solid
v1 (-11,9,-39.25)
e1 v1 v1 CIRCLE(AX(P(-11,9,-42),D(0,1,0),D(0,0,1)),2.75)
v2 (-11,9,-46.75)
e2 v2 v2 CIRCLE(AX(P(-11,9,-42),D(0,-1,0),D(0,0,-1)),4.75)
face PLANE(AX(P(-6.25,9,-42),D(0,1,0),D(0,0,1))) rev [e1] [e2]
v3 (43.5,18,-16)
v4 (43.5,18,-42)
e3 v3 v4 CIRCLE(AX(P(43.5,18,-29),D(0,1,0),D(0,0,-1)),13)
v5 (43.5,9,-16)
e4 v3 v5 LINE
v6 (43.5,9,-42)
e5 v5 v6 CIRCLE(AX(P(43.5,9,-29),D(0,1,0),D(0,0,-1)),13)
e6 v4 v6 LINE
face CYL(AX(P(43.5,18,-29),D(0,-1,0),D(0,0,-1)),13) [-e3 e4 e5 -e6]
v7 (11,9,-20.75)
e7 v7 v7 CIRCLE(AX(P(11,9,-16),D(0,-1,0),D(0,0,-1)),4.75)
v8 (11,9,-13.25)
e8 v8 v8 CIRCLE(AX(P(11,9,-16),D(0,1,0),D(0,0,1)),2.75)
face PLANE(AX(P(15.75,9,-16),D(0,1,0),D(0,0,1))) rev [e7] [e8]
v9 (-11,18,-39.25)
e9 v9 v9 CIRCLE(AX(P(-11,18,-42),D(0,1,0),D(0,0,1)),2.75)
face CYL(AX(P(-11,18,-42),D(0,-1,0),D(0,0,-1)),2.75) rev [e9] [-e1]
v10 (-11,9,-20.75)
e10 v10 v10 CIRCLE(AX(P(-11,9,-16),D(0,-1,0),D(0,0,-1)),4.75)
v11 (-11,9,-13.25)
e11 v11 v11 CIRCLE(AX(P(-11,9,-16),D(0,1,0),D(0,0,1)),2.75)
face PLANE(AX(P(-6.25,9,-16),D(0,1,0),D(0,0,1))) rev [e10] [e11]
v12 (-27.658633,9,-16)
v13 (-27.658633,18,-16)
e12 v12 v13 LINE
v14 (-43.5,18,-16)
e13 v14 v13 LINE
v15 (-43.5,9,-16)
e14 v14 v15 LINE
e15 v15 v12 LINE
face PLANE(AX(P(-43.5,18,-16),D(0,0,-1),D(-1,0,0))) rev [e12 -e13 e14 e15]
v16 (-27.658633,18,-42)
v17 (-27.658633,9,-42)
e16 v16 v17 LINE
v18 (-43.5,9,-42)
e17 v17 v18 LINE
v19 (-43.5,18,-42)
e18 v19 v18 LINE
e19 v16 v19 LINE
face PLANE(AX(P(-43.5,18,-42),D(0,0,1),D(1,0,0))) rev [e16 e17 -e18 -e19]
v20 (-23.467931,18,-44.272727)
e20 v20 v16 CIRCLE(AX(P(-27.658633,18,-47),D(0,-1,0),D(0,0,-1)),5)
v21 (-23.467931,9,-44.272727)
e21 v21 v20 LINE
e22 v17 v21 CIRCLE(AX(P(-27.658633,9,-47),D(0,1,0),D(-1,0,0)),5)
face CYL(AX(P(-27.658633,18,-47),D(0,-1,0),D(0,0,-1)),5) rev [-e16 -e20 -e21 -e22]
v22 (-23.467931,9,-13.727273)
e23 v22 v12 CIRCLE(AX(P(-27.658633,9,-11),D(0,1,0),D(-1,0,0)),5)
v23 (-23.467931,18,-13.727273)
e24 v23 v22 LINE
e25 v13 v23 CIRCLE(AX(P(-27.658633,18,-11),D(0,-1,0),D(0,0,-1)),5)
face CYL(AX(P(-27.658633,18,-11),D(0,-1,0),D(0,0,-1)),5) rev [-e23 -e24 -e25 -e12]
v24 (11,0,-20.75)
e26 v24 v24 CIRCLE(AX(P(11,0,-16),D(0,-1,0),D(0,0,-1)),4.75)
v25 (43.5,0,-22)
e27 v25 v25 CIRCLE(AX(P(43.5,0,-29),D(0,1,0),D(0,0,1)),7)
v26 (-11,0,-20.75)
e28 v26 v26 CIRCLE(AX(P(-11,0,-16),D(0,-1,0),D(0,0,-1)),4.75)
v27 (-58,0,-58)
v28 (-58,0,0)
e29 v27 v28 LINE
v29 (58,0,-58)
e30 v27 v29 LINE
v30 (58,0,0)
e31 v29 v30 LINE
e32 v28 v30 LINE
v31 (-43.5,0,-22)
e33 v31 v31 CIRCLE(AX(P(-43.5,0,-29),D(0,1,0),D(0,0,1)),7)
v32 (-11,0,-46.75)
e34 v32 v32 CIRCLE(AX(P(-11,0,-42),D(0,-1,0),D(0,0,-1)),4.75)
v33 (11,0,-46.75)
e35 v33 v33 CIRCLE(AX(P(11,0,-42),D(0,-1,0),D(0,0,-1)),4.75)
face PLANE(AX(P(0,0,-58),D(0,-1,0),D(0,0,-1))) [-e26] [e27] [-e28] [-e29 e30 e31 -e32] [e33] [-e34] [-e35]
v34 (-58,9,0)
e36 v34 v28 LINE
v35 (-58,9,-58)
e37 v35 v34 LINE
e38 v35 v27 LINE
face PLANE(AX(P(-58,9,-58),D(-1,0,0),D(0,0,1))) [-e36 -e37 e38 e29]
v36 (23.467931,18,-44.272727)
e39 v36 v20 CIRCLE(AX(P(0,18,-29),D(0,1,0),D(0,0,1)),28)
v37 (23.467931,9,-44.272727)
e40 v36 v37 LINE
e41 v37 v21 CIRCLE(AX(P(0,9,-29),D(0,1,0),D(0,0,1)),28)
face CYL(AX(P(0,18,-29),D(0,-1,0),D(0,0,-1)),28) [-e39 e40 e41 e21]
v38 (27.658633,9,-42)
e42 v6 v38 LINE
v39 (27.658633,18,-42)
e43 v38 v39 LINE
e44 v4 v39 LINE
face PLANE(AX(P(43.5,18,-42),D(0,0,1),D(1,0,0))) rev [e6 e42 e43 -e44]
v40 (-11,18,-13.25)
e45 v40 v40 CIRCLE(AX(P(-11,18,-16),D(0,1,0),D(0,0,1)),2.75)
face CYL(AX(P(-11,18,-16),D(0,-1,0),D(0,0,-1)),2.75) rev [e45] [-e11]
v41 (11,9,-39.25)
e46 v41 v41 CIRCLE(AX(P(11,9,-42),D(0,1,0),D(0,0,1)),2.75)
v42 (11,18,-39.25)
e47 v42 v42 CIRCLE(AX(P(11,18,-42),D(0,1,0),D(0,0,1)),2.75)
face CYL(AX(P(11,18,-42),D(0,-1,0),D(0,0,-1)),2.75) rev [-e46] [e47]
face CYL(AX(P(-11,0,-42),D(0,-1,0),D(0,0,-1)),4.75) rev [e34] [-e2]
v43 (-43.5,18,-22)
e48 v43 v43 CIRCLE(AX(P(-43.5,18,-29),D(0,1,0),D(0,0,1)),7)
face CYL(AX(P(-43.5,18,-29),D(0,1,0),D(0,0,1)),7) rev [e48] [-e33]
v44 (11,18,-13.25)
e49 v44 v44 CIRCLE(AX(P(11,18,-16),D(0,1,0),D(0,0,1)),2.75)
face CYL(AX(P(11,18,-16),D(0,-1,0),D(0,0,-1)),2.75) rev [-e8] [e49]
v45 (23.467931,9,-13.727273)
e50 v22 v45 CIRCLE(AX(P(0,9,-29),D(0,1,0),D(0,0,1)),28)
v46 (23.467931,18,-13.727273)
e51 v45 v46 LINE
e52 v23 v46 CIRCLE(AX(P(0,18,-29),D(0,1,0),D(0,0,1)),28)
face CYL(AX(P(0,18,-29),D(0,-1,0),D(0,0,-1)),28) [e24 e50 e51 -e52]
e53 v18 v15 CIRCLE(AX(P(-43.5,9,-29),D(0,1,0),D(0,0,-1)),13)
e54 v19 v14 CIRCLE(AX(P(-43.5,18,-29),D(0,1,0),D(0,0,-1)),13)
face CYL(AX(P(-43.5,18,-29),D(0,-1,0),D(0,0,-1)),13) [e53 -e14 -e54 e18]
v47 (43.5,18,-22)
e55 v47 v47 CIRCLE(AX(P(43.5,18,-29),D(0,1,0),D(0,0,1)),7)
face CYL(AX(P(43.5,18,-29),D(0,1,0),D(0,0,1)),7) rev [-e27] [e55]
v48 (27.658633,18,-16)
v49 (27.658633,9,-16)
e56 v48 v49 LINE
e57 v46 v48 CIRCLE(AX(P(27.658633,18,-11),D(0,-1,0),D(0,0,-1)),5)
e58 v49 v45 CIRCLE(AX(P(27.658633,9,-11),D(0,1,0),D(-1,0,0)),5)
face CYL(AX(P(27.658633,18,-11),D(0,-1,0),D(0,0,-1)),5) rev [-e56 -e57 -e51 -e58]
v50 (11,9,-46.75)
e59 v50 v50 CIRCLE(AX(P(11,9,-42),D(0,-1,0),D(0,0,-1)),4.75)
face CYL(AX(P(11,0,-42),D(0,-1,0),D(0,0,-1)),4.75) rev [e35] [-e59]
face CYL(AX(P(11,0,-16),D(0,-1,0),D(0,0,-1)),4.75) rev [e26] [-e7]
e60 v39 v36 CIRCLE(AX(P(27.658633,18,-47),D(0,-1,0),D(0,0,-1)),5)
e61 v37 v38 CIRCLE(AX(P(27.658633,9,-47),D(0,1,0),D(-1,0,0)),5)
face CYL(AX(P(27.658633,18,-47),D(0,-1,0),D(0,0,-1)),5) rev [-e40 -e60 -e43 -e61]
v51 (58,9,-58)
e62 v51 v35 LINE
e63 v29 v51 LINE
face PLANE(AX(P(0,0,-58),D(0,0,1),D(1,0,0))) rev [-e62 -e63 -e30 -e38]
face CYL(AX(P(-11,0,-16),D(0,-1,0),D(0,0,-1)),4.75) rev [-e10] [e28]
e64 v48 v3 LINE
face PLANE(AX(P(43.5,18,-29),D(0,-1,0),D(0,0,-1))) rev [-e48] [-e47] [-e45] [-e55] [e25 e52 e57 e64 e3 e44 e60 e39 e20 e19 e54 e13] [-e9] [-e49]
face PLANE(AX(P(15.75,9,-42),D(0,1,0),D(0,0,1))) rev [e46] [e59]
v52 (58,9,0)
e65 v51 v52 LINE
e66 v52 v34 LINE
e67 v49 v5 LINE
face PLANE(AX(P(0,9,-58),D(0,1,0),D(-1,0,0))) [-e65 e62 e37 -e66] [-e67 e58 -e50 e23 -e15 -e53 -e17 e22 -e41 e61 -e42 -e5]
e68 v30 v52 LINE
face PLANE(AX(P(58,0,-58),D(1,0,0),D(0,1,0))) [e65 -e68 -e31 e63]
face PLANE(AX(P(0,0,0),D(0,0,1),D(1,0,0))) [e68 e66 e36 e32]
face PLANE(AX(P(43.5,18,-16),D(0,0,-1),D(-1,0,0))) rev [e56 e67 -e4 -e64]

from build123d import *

# Parameters (mm, degrees)
RESSALTO_EXTRUS_O1_DEPTH     = 58
ESBO_O3_R                    = 2.75
RESSALTO_EXTRUS_O2_DEPTH     = 9
FILETE1_R                    = 5
FURO_DE_DI_METRO_0_15_14_1_D = 14
FUROAVAN_ADO1_OUTLINE_R      = 4.75
FUROAVAN_ADO1_DEPTH          = 9


# Read off the part's stored shape, not the designer's step: FuroAvançado1
with BuildPart() as part:
    # Esboço2 → Ressalto-extrusão1 (new body)
    with BuildSketch(Plane.XY):
        Polygon((-58, 0), (0, 0), (58, 0), (58, 9), (0, 9), (-58, 9), align=None)
    extrude(amount=-RESSALTO_EXTRUS_O1_DEPTH)

    # Esboço3 → Ressalto-extrusão2 (add)
    with BuildSketch(Plane(origin=(0, 9, 0), x_dir=(1, 0, 0), z_dir=(0, 1, 0))):
        with BuildLine():
            Line((-43.5, 42), (-24.799193535, 42))
            ThreePointArc((-24.799193535, 42), (0, 57), (24.799193535, 42))
            Line((24.799193535, 42), (43.5, 42))
            ThreePointArc((43.5, 42), (56.5, 29), (43.5, 16))
            Line((43.5, 16), (24.799193535, 16))
            ThreePointArc((24.799193535, 16), (0, 1), (-24.799193535, 16))
            Line((-24.799193535, 16), (-43.5, 16))
            ThreePointArc((-43.5, 16), (-56.5, 29), (-43.5, 42))
        make_face()
        with Locations(Location((-11, 42, 0), (0, 0, 270))):
            Circle(ESBO_O3_R, mode=Mode.SUBTRACT)
        with Locations(Location((11, 42, 0), (0, 0, 270))):
            Circle(ESBO_O3_R, mode=Mode.SUBTRACT)
        with Locations(Location((-11, 16, 0), (0, 0, 270))):
            Circle(ESBO_O3_R, mode=Mode.SUBTRACT)
        with Locations(Location((11, 16, 0), (0, 0, 270))):
            Circle(ESBO_O3_R, mode=Mode.SUBTRACT)
    extrude(amount=RESSALTO_EXTRUS_O2_DEPTH)

    # Filete1
    filete1_edges = [part.edges().sort_by_distance(p)[0] for p in [
        (24.799193535, 13.5, -42),
        (-24.799193535, 13.5, -42),
        (-24.799193535, 13.5, -16),
        (24.799193535, 13.5, -16),
    ]]
    fillet(filete1_edges, radius=FILETE1_R)

    # Furo de diâmetro Ø0.15 (14)1 (through all)
    with Locations(Plane(origin=(0, 18, 0), x_dir=(1, 0, 0), z_dir=(0, 1, 0))):
        with Locations((-43.5, 29), (43.5, 29)):
            Hole(FURO_DE_DI_METRO_0_15_14_1_D / 2)

    # FuroAvançado1 outline → FuroAvançado1 (cut)
    with BuildSketch(Plane(origin=(0, 0, 0), x_dir=(1, 0, 0), z_dir=(0, 1, 0))):
        with Locations((-11, 42)):
            Circle(FUROAVAN_ADO1_OUTLINE_R)
        with Locations((-11, 16)):
            Circle(FUROAVAN_ADO1_OUTLINE_R)
        with Locations((11, 16)):
            Circle(FUROAVAN_ADO1_OUTLINE_R)
        with Locations((11, 42)):
            Circle(FUROAVAN_ADO1_OUTLINE_R)
    extrude(amount=FUROAVAN_ADO1_DEPTH, mode=Mode.SUBTRACT)


solid = part.part
